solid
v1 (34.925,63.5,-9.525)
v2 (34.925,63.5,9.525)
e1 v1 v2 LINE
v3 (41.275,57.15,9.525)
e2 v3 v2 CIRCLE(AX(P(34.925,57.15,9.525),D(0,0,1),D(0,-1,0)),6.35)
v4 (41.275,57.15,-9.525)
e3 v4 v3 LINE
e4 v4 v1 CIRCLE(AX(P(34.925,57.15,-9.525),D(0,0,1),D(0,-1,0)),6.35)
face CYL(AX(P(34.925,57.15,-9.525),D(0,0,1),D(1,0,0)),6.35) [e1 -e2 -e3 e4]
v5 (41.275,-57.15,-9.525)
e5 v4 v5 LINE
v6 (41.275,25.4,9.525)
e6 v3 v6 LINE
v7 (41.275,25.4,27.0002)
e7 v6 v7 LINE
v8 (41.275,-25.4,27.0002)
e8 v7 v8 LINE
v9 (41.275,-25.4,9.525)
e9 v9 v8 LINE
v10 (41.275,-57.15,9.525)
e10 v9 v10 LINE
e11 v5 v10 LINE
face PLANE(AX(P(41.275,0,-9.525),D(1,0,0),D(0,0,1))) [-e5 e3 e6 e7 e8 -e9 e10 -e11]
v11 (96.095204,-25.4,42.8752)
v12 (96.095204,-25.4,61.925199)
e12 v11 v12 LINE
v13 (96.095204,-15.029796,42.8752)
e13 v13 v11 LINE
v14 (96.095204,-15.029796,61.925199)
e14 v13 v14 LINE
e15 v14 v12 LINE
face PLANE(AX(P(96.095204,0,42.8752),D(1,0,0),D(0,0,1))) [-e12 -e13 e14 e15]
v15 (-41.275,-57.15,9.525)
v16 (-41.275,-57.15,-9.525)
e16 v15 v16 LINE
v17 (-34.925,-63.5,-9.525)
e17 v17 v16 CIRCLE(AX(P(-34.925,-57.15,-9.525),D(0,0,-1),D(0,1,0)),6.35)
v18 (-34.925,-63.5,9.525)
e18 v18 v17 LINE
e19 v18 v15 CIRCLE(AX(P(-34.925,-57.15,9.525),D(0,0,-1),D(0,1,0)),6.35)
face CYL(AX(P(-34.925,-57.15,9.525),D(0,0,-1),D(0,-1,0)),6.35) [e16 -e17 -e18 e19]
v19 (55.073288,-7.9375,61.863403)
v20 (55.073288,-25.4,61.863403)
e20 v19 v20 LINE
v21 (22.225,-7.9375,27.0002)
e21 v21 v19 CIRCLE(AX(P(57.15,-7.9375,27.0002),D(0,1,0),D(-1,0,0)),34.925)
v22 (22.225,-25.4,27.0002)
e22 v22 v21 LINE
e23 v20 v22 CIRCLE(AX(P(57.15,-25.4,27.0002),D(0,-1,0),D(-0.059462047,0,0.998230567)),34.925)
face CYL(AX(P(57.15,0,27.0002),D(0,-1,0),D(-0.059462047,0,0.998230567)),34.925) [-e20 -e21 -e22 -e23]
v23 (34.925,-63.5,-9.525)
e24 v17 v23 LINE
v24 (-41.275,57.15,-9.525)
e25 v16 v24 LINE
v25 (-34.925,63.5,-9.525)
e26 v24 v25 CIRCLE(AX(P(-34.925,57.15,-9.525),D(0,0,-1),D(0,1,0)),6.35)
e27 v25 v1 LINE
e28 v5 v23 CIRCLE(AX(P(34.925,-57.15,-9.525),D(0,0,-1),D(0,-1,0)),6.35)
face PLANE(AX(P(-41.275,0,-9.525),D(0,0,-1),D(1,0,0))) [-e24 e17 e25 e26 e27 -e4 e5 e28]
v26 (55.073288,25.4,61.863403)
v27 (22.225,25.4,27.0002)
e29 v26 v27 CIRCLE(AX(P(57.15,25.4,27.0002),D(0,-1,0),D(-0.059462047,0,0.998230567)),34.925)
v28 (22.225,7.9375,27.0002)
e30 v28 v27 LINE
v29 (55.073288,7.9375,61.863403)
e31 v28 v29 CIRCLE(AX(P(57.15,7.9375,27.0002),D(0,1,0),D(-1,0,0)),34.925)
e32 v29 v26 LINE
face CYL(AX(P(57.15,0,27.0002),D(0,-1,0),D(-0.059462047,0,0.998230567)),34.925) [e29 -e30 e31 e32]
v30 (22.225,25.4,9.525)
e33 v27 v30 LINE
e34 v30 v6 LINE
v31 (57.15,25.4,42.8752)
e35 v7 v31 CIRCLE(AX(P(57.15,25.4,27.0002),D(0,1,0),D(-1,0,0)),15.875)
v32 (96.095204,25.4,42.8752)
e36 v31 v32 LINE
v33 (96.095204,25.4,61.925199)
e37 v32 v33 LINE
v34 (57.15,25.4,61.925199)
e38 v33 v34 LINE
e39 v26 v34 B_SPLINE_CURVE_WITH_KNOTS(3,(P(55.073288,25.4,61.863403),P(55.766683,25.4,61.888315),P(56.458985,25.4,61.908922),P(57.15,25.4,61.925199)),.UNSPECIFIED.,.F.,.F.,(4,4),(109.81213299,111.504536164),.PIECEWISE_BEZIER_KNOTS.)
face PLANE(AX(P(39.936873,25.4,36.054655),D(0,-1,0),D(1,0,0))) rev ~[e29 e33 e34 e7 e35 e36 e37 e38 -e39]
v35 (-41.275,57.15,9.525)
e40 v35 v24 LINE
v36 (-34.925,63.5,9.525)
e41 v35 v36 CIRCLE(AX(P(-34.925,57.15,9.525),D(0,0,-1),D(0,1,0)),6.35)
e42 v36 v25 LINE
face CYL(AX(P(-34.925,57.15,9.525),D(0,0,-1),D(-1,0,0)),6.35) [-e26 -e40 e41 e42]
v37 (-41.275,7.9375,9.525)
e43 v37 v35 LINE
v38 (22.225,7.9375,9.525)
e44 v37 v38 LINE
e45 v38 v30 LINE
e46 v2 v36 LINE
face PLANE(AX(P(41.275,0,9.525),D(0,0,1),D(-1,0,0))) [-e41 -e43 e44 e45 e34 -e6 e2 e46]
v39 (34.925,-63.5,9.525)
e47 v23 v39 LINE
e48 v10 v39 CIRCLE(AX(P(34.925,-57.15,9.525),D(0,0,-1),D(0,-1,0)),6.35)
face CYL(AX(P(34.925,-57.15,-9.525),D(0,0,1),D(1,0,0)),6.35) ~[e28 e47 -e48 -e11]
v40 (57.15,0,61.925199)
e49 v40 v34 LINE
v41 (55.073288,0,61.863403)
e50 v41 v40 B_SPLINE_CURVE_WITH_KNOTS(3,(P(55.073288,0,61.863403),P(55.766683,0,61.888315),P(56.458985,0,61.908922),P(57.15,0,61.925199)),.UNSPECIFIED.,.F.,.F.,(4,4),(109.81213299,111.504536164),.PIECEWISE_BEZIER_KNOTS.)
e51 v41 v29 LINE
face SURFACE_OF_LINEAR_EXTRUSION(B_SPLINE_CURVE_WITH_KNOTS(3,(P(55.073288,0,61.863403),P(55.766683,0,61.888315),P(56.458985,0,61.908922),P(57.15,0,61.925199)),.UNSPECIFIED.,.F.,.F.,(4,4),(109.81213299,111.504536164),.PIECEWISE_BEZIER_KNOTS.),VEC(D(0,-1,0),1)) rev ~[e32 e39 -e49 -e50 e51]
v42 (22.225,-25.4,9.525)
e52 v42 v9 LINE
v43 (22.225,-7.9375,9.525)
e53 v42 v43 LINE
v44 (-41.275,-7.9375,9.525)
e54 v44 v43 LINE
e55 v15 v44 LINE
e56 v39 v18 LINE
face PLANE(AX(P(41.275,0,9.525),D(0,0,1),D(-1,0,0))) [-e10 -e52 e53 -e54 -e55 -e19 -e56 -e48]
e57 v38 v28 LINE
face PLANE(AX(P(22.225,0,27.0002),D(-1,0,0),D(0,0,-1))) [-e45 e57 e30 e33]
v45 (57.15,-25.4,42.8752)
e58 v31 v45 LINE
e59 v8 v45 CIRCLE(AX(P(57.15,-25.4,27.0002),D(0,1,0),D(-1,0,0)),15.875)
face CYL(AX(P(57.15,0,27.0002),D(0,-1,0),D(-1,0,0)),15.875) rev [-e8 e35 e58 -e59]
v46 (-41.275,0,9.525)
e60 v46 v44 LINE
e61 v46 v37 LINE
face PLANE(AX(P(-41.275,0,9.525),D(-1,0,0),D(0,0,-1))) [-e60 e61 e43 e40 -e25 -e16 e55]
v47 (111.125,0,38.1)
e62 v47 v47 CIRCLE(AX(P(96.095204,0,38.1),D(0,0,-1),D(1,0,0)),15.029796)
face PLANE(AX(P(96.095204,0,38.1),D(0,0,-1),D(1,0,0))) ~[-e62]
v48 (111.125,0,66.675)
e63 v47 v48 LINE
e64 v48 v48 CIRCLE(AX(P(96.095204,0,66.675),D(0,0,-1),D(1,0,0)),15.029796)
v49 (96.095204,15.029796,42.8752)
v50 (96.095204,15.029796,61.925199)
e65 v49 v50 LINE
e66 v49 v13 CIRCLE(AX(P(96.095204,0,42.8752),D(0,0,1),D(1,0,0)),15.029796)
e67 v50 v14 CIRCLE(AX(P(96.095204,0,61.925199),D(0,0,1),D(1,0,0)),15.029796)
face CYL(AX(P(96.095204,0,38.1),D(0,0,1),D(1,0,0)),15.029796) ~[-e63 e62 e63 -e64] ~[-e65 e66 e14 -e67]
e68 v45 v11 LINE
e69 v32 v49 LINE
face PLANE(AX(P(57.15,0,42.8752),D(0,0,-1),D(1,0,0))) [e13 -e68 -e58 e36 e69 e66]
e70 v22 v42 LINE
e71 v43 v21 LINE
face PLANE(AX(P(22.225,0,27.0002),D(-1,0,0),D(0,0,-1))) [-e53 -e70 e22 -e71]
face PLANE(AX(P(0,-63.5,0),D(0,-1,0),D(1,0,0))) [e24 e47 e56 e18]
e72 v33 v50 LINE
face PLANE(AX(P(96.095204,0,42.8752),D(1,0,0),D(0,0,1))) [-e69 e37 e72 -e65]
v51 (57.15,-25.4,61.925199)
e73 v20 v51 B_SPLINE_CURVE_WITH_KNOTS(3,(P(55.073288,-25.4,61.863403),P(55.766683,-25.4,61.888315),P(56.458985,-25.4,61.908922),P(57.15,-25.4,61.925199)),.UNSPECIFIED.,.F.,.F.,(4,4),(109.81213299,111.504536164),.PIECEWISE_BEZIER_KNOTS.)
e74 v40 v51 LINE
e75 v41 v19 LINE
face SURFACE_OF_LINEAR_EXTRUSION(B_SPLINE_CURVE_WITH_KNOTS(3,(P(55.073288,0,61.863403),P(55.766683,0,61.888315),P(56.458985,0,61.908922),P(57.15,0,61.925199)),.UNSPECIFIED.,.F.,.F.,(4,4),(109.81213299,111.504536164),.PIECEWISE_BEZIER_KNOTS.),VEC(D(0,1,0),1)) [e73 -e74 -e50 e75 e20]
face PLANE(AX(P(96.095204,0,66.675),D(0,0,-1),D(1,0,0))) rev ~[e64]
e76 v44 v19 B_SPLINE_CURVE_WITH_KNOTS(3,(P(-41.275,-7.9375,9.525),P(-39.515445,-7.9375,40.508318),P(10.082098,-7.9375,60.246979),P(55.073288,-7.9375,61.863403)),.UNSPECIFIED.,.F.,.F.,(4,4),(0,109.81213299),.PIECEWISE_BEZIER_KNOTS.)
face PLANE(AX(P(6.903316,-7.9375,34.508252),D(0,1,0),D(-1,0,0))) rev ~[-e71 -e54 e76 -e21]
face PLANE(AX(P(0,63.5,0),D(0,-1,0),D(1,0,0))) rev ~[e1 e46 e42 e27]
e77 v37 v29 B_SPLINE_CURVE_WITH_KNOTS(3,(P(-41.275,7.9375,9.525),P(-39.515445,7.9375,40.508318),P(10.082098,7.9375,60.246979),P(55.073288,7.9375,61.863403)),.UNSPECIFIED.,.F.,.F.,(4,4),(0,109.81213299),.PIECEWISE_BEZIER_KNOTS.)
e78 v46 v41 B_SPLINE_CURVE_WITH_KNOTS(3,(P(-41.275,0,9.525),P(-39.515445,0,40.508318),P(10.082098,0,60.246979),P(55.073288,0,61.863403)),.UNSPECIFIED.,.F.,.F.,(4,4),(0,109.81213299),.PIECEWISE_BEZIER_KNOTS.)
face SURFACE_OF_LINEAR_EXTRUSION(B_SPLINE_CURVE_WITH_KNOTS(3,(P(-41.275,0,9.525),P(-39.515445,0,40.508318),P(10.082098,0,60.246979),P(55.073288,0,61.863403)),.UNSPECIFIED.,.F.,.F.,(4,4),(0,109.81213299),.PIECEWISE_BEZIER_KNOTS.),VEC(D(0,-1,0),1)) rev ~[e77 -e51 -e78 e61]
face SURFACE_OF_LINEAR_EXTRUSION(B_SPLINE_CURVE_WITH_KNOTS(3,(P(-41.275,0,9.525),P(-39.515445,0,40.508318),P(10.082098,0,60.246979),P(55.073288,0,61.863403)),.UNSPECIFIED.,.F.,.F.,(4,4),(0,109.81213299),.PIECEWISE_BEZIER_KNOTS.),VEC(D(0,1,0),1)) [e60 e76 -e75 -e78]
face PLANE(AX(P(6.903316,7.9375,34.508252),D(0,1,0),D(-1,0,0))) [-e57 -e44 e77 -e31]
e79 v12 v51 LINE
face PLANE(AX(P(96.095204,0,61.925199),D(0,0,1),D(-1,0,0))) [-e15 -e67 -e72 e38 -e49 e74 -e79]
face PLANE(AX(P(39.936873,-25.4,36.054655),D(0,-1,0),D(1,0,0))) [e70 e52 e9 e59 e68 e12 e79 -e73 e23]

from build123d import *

# Parameters (mm, degrees)
F1_DEPTH = 63.5
F0_W     = 35.7702043533
F0_H     = 19.0499988828
F2_DEPTH = 25.4
F3_DEPTH = 7.9375
F5_R     = 6.35


# Not quite as in the source:
# - ends of sketch curves that miss each other by under 0.0002 mm in the source are joined


with BuildPart() as f1:
    # F0 (on Front) → F1 (new body, symmetric)
    with BuildSketch(Plane.XZ):
        Polygon((-41.275, -9.525), (41.275, -9.525), (41.275, 9.525), (22.225, 9.525), (-41.275, 9.525), align=None)
    extrude(amount=F1_DEPTH, both=True)

    # F0 (on Front) → F2 (join, symmetric)
    with BuildSketch(Plane.XZ):
        with BuildLine():
            Line((22.225, 9.525), (41.275, 9.525))
            Line((41.275, 9.525), (41.275, 27.0002))
            ThreePointArc((41.275, 27.0002), (45.9246798487, 38.2255201513), (57.15, 42.8752))
            Line((57.15, 42.8752), (60.325, 42.8752))
            Line((60.325, 42.8752), (60.325, 61.9251988828))
            Line((60.325, 61.9251988828), (57.15, 61.9251988828))
            add(Edge.make_bspline(
                [(55.0732880095, 61.8634025538), (55.7666834516, 61.8883145564), (56.4589847756, 61.9089220973), (57.15, 61.9251988828)],
                knots=[109.8121329902, 109.8121329902, 109.8121329902, 109.8121329902, 111.5045361635, 111.5045361635, 111.5045361635, 111.5045361635], degree=3))
            ThreePointArc((55.0732880095, 61.8634025538), (31.7306688594, 50.9504239941), (22.225, 27.0002))
            Line((22.225, 27.0002), (22.225, 9.525))
        make_face()
        with Locations((78.2101021767, 52.4001994414)):
            Rectangle(F0_W, F0_H)
    extrude(amount=F2_DEPTH, both=True)

    # F0 (on Front) → F3 (join, symmetric)
    with BuildSketch(Plane.XZ):
        with BuildLine():
            add(Edge.make_bspline(
                [(-41.275, 9.525), (-39.5154446815, 40.5083175564), (10.0820981423, 60.2469791277), (55.0732880095, 61.8634025538)],
                knots=[0, 0, 0, 0, 109.8121329902, 109.8121329902, 109.8121329902, 109.8121329902], degree=3))
            Line((-41.275, 9.525), (22.225, 9.525))
            Line((22.225, 9.525), (22.225, 27.0002))
            ThreePointArc((22.225, 27.0002), (31.7306688594, 50.9504239941), (55.0732880095, 61.8634025538))
        make_face()
    extrude(amount=F3_DEPTH, both=True)

    # F0 (on Front) → F4 (revolve)
    with BuildSketch(Plane.XZ):
        Polygon((96.0952043533, 61.9251988828), (96.0952043533, 42.8752), (96.0952043533, 38.1), (111.125, 38.1), (111.125, 66.675), (96.0952043533, 66.675), align=None)
    revolve(axis=Axis((96.0952043533, 0, 52.3875), (0, 0, -1)))

    # F5
    f5_edges = [f1.edges().sort_by_distance(p)[0] for p in [
        (41.275, -63.5, 0),
        (-41.275, -63.5, 0),
        (41.275, 63.5, 0),
        (-41.275, 63.5, 0),
    ]]
    fillet(f5_edges, radius=F5_R)


solid = f1.part
